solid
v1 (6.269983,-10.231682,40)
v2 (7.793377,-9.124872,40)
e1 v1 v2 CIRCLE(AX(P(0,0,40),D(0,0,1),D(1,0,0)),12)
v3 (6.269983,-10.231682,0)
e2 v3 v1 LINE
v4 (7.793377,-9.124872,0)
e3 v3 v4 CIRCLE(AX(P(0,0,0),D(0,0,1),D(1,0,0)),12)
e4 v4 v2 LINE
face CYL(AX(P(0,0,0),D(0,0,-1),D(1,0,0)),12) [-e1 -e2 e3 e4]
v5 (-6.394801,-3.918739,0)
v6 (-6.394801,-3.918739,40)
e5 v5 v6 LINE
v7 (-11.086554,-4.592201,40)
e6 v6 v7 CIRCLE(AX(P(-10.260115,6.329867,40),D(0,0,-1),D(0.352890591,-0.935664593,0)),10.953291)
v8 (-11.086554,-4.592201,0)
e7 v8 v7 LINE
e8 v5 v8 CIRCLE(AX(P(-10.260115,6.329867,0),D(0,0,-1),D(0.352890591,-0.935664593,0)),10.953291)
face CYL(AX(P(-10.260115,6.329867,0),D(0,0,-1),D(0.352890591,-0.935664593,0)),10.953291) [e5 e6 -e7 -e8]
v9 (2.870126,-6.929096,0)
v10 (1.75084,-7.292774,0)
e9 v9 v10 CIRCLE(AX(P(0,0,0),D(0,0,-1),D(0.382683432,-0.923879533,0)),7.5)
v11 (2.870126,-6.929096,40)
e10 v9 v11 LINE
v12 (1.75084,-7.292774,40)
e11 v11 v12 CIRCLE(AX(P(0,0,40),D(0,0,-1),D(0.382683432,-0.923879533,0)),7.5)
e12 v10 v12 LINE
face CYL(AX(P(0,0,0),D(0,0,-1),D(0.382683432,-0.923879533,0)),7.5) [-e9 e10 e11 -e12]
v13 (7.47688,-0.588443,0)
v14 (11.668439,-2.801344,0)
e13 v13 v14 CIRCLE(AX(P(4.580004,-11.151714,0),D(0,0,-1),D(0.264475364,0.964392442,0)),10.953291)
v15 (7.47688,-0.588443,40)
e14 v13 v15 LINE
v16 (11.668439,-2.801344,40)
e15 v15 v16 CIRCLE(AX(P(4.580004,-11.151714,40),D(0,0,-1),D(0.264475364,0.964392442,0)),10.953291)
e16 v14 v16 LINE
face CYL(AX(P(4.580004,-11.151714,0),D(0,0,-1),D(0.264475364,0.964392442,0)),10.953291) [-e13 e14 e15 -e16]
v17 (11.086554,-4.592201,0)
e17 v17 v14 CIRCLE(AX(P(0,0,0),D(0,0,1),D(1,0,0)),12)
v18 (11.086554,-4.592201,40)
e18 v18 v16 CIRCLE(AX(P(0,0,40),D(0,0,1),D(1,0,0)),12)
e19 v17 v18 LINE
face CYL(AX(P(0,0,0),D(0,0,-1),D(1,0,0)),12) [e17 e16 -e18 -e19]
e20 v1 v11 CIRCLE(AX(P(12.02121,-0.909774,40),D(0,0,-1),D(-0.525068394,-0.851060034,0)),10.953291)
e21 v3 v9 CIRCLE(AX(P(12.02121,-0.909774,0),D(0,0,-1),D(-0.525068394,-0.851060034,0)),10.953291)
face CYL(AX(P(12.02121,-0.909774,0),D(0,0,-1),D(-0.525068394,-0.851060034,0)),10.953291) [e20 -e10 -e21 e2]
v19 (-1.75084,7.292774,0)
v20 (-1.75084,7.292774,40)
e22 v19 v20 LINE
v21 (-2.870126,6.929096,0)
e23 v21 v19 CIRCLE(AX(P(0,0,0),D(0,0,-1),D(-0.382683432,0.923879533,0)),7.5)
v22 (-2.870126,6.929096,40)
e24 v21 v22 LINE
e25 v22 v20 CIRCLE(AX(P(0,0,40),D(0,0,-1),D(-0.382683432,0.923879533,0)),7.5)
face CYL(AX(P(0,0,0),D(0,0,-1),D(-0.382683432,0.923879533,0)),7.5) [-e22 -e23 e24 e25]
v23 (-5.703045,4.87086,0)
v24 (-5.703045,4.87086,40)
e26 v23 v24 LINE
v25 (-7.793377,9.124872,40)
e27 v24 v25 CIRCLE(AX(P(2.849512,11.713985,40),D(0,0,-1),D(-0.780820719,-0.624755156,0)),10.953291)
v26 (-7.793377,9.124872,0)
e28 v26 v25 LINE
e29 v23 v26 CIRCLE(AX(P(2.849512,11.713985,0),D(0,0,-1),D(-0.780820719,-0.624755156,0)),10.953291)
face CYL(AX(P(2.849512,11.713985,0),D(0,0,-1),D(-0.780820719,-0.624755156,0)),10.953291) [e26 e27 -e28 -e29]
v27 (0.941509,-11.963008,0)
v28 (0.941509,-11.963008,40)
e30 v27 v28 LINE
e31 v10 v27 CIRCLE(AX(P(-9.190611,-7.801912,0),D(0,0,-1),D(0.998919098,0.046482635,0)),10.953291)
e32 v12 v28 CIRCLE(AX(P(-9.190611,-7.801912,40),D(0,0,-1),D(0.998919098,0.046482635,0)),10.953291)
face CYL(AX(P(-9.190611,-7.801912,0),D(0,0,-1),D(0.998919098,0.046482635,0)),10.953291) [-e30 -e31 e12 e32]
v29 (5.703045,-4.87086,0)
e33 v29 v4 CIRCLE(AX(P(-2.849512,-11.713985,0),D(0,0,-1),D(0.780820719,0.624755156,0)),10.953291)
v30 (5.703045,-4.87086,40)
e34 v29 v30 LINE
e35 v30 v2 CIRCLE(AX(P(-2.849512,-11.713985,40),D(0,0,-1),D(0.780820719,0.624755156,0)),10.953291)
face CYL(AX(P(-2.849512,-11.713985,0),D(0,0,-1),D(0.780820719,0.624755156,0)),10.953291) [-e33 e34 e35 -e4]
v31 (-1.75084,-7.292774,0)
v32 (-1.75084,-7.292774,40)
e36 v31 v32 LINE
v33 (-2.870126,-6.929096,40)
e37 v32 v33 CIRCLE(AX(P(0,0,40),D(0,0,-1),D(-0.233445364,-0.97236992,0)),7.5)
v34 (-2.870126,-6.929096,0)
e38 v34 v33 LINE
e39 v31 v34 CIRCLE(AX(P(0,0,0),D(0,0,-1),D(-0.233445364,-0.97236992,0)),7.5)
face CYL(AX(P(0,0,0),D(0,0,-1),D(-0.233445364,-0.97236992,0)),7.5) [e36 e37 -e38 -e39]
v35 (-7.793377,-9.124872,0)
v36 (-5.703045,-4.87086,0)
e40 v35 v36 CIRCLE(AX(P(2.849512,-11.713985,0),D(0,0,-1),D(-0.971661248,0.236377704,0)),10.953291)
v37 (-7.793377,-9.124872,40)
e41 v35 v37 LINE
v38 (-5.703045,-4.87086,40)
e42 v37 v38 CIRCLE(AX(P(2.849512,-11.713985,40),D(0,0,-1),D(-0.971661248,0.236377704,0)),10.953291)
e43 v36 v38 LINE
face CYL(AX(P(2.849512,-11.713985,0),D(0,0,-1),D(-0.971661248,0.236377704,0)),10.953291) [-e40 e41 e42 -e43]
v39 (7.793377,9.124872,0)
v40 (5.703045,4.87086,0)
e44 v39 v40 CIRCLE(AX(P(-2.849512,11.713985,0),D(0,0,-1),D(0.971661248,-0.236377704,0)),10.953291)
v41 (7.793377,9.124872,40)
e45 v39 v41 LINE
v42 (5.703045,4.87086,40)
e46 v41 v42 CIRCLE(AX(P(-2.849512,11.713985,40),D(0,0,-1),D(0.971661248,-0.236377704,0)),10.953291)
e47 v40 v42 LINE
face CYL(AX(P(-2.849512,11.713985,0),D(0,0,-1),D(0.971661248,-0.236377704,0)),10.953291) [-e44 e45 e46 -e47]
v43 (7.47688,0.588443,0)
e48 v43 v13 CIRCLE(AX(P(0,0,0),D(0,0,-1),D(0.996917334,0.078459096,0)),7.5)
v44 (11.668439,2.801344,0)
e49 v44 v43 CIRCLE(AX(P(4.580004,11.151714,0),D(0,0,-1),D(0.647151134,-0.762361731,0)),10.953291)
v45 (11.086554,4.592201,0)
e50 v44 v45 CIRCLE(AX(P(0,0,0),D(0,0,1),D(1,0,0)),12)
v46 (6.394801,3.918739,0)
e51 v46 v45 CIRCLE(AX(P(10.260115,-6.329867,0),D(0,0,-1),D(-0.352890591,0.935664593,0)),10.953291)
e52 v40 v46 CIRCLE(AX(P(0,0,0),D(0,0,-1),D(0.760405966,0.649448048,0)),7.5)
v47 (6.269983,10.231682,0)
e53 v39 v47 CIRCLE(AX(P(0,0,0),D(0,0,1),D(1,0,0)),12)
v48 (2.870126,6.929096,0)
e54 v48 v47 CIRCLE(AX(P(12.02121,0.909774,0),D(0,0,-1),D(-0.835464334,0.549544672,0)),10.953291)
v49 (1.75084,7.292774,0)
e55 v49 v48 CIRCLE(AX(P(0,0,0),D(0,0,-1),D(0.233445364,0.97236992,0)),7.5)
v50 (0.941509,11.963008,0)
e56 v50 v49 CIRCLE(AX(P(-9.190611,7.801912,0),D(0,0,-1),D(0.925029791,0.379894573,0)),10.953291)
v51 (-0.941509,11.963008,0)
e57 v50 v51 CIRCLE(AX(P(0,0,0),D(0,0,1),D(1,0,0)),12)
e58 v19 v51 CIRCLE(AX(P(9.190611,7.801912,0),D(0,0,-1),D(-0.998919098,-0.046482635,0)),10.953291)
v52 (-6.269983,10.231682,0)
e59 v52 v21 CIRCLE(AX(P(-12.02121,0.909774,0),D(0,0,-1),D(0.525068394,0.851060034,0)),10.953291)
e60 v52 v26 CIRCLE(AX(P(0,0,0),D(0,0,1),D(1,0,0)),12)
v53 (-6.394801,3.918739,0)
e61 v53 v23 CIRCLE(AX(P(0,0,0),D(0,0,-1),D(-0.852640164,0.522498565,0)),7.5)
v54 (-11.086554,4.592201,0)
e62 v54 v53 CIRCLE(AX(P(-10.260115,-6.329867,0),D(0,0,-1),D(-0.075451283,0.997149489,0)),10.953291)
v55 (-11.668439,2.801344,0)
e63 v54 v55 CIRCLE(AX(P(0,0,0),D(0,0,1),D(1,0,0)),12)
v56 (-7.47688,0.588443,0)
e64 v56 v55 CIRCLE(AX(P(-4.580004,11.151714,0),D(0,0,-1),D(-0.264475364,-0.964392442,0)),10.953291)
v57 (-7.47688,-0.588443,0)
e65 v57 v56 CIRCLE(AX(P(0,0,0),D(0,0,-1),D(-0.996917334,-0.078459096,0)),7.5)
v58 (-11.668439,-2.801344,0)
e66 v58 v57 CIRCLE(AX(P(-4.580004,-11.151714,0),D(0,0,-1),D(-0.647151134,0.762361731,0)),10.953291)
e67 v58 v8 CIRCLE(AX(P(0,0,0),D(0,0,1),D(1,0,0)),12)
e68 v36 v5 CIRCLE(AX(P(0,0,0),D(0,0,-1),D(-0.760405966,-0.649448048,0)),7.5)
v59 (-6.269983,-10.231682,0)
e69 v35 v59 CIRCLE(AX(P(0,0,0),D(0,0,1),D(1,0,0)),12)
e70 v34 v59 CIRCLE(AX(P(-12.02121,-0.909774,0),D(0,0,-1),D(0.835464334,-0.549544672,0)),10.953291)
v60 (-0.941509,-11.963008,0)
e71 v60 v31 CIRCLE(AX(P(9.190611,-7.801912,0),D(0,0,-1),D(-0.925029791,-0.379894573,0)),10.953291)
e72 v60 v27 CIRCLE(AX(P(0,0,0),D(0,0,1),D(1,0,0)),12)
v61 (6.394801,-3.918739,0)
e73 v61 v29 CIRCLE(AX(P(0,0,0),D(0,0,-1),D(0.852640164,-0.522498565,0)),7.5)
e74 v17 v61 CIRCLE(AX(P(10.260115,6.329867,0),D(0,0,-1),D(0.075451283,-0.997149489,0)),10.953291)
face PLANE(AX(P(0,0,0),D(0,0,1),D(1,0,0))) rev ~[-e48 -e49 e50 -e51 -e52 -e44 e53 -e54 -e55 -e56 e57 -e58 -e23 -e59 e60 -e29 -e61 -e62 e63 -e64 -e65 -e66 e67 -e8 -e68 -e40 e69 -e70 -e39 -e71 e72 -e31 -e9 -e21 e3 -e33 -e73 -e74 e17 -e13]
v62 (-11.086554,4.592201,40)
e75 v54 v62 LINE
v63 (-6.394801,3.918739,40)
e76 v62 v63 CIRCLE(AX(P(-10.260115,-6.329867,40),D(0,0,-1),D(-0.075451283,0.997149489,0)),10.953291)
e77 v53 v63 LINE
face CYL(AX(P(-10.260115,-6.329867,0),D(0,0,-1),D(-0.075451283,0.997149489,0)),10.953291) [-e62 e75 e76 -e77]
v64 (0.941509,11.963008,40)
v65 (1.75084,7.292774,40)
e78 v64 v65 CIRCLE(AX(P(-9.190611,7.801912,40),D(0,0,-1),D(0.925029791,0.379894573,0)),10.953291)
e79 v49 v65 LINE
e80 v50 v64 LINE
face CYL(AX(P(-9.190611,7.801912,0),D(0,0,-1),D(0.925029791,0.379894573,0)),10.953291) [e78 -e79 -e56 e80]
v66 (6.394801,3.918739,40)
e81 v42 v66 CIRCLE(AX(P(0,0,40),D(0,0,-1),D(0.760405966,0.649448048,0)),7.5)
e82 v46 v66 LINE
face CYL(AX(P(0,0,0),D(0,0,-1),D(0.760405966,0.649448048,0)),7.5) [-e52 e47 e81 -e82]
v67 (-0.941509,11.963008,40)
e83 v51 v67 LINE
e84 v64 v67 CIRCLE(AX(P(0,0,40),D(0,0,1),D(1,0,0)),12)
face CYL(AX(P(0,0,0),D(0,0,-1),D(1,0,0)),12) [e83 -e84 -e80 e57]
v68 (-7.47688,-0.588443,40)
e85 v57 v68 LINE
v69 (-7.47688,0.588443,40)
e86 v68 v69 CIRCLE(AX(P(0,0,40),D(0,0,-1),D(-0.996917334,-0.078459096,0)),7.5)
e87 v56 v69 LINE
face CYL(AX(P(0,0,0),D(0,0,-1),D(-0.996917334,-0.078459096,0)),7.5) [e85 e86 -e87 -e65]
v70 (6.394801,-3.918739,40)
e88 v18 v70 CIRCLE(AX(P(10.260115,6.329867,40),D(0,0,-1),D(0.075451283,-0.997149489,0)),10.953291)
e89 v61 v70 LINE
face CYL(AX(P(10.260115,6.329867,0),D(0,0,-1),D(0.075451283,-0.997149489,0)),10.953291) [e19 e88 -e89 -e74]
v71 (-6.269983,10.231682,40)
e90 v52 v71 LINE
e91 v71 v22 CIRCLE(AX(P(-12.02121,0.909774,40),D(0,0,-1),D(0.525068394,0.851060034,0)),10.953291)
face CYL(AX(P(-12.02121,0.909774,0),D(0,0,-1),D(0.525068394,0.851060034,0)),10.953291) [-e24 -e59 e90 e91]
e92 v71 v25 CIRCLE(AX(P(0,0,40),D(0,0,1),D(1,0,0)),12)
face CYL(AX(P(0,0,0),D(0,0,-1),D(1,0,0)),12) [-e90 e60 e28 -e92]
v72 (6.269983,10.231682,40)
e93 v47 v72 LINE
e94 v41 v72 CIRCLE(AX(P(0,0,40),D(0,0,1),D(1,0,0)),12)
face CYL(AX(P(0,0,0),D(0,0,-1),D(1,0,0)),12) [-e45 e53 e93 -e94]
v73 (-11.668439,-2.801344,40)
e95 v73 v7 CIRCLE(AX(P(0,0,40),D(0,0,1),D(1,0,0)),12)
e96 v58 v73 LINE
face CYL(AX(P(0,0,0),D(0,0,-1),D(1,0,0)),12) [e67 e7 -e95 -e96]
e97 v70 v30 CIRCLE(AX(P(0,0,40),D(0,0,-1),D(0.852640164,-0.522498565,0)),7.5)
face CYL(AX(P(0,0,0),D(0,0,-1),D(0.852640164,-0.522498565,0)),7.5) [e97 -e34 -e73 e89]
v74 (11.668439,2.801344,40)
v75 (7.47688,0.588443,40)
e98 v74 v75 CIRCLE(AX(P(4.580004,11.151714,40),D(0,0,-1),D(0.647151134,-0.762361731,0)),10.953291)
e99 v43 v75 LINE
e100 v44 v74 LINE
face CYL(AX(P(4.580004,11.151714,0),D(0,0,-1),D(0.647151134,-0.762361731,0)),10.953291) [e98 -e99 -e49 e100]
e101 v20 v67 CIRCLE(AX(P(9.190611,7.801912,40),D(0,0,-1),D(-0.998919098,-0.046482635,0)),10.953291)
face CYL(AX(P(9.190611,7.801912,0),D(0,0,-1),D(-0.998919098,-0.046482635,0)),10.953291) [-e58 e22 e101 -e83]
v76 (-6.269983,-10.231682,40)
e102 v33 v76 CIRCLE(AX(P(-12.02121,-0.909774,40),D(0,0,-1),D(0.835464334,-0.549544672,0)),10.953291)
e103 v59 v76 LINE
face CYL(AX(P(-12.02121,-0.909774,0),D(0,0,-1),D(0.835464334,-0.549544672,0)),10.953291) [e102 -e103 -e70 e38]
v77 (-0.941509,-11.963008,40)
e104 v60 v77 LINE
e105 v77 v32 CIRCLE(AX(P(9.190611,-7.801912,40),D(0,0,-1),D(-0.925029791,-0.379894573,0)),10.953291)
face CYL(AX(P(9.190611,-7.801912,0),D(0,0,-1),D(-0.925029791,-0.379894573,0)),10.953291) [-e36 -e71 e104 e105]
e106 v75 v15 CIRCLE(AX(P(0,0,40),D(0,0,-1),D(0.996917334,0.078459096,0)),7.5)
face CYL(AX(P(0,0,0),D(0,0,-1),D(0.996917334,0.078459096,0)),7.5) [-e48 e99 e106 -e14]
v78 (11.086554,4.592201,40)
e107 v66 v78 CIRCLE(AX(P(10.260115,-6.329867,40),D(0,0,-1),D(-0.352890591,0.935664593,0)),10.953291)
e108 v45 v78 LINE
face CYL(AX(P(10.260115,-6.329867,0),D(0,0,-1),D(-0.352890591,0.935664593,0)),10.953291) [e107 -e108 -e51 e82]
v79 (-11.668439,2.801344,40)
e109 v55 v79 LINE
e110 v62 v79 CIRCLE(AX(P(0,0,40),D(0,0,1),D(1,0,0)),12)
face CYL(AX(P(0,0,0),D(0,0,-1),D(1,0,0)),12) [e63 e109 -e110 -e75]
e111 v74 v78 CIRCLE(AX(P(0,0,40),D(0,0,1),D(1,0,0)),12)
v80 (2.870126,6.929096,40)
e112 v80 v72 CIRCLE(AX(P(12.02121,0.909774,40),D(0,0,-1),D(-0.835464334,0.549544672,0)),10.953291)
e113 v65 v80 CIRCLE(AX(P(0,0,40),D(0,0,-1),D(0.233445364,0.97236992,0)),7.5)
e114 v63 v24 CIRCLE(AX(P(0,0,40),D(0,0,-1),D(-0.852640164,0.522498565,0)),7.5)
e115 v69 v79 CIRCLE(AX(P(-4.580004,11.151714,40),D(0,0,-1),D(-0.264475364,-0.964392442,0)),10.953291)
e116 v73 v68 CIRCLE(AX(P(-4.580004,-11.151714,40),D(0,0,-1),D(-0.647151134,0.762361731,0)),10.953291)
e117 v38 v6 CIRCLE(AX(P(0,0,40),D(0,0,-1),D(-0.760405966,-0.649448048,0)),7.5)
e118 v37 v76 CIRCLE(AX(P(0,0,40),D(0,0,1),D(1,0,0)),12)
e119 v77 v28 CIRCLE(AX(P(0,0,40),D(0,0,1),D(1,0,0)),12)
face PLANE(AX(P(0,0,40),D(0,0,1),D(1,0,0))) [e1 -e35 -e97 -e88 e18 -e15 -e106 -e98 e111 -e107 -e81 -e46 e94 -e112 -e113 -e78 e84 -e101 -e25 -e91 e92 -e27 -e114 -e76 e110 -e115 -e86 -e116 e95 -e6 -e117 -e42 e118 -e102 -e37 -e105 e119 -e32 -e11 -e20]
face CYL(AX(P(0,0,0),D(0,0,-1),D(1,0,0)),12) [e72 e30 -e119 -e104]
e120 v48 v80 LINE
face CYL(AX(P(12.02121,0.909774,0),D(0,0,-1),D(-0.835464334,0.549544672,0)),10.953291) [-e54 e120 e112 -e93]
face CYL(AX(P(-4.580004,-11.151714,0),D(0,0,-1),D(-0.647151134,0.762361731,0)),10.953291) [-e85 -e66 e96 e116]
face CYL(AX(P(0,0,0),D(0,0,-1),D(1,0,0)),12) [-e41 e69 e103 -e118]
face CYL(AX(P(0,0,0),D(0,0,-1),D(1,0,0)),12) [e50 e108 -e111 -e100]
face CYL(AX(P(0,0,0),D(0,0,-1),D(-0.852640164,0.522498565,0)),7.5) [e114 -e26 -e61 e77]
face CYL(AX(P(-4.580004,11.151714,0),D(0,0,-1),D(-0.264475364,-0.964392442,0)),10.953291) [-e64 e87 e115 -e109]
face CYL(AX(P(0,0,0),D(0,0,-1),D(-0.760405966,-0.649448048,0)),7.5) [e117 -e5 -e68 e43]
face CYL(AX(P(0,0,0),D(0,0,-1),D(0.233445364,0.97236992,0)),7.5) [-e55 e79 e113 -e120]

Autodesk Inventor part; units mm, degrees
sketch "Sketch1" plane through (0, 0, 0) normal (0, 0, 1) x (1, 0, 0)
  circle A0 centre (0, 0) radius 12
  dimension "d0" = 24
extrude "Extrusion1" add sketch "Sketch1" along normal blind 40
ref_plane "Work Plane2" through (0, 0, 20) normal (0, 0, 1) x (1, 0, 0)
sketch "Sketch2" plane through (0, 0, 0) normal (0, 0, -1) x (-1, 0, 0)
  circle A0 centre (0, 0) radius 12 projected
  circle A1 centre (0, 0) radius 10
  dimension "d3" = 20
surface extrude "Pitch Diameter" sketch "Sketch2" against normal through all shown no curves A1
ref_plane "Work Plane8" through (0, 0, 0) normal (0.9510565, 0.309017, 0) x (0, 0, 1)
ref_plane "Work Plane9" through (0, 0, 0) normal (1, 0, 0) x (0, 1, 0)
spur gear teeth "Spur Gear" teeth 10 pitch diameter 20 tip diameter 24 root diameter 15 face width 40 start plane through (0, 0, 0) normal (0, 0, -1) x (-1, 0, 0)
equation "\"d0\" = da_da"
equation "\"d1\" = da_b"
equation "\"d3\" = da_d"
equation "\"d16\" = da_aw"
equation "\"d43\" = da_aw"
equation "\"d46\" = da_aw"
equation "\"da_da\" = 24"
equation "\"da_b\" = 40"
equation "\"da_d\" = 20"
equation "\"da_aw\" = 35"
properties part number "Spur Gear1" material "Steel"
